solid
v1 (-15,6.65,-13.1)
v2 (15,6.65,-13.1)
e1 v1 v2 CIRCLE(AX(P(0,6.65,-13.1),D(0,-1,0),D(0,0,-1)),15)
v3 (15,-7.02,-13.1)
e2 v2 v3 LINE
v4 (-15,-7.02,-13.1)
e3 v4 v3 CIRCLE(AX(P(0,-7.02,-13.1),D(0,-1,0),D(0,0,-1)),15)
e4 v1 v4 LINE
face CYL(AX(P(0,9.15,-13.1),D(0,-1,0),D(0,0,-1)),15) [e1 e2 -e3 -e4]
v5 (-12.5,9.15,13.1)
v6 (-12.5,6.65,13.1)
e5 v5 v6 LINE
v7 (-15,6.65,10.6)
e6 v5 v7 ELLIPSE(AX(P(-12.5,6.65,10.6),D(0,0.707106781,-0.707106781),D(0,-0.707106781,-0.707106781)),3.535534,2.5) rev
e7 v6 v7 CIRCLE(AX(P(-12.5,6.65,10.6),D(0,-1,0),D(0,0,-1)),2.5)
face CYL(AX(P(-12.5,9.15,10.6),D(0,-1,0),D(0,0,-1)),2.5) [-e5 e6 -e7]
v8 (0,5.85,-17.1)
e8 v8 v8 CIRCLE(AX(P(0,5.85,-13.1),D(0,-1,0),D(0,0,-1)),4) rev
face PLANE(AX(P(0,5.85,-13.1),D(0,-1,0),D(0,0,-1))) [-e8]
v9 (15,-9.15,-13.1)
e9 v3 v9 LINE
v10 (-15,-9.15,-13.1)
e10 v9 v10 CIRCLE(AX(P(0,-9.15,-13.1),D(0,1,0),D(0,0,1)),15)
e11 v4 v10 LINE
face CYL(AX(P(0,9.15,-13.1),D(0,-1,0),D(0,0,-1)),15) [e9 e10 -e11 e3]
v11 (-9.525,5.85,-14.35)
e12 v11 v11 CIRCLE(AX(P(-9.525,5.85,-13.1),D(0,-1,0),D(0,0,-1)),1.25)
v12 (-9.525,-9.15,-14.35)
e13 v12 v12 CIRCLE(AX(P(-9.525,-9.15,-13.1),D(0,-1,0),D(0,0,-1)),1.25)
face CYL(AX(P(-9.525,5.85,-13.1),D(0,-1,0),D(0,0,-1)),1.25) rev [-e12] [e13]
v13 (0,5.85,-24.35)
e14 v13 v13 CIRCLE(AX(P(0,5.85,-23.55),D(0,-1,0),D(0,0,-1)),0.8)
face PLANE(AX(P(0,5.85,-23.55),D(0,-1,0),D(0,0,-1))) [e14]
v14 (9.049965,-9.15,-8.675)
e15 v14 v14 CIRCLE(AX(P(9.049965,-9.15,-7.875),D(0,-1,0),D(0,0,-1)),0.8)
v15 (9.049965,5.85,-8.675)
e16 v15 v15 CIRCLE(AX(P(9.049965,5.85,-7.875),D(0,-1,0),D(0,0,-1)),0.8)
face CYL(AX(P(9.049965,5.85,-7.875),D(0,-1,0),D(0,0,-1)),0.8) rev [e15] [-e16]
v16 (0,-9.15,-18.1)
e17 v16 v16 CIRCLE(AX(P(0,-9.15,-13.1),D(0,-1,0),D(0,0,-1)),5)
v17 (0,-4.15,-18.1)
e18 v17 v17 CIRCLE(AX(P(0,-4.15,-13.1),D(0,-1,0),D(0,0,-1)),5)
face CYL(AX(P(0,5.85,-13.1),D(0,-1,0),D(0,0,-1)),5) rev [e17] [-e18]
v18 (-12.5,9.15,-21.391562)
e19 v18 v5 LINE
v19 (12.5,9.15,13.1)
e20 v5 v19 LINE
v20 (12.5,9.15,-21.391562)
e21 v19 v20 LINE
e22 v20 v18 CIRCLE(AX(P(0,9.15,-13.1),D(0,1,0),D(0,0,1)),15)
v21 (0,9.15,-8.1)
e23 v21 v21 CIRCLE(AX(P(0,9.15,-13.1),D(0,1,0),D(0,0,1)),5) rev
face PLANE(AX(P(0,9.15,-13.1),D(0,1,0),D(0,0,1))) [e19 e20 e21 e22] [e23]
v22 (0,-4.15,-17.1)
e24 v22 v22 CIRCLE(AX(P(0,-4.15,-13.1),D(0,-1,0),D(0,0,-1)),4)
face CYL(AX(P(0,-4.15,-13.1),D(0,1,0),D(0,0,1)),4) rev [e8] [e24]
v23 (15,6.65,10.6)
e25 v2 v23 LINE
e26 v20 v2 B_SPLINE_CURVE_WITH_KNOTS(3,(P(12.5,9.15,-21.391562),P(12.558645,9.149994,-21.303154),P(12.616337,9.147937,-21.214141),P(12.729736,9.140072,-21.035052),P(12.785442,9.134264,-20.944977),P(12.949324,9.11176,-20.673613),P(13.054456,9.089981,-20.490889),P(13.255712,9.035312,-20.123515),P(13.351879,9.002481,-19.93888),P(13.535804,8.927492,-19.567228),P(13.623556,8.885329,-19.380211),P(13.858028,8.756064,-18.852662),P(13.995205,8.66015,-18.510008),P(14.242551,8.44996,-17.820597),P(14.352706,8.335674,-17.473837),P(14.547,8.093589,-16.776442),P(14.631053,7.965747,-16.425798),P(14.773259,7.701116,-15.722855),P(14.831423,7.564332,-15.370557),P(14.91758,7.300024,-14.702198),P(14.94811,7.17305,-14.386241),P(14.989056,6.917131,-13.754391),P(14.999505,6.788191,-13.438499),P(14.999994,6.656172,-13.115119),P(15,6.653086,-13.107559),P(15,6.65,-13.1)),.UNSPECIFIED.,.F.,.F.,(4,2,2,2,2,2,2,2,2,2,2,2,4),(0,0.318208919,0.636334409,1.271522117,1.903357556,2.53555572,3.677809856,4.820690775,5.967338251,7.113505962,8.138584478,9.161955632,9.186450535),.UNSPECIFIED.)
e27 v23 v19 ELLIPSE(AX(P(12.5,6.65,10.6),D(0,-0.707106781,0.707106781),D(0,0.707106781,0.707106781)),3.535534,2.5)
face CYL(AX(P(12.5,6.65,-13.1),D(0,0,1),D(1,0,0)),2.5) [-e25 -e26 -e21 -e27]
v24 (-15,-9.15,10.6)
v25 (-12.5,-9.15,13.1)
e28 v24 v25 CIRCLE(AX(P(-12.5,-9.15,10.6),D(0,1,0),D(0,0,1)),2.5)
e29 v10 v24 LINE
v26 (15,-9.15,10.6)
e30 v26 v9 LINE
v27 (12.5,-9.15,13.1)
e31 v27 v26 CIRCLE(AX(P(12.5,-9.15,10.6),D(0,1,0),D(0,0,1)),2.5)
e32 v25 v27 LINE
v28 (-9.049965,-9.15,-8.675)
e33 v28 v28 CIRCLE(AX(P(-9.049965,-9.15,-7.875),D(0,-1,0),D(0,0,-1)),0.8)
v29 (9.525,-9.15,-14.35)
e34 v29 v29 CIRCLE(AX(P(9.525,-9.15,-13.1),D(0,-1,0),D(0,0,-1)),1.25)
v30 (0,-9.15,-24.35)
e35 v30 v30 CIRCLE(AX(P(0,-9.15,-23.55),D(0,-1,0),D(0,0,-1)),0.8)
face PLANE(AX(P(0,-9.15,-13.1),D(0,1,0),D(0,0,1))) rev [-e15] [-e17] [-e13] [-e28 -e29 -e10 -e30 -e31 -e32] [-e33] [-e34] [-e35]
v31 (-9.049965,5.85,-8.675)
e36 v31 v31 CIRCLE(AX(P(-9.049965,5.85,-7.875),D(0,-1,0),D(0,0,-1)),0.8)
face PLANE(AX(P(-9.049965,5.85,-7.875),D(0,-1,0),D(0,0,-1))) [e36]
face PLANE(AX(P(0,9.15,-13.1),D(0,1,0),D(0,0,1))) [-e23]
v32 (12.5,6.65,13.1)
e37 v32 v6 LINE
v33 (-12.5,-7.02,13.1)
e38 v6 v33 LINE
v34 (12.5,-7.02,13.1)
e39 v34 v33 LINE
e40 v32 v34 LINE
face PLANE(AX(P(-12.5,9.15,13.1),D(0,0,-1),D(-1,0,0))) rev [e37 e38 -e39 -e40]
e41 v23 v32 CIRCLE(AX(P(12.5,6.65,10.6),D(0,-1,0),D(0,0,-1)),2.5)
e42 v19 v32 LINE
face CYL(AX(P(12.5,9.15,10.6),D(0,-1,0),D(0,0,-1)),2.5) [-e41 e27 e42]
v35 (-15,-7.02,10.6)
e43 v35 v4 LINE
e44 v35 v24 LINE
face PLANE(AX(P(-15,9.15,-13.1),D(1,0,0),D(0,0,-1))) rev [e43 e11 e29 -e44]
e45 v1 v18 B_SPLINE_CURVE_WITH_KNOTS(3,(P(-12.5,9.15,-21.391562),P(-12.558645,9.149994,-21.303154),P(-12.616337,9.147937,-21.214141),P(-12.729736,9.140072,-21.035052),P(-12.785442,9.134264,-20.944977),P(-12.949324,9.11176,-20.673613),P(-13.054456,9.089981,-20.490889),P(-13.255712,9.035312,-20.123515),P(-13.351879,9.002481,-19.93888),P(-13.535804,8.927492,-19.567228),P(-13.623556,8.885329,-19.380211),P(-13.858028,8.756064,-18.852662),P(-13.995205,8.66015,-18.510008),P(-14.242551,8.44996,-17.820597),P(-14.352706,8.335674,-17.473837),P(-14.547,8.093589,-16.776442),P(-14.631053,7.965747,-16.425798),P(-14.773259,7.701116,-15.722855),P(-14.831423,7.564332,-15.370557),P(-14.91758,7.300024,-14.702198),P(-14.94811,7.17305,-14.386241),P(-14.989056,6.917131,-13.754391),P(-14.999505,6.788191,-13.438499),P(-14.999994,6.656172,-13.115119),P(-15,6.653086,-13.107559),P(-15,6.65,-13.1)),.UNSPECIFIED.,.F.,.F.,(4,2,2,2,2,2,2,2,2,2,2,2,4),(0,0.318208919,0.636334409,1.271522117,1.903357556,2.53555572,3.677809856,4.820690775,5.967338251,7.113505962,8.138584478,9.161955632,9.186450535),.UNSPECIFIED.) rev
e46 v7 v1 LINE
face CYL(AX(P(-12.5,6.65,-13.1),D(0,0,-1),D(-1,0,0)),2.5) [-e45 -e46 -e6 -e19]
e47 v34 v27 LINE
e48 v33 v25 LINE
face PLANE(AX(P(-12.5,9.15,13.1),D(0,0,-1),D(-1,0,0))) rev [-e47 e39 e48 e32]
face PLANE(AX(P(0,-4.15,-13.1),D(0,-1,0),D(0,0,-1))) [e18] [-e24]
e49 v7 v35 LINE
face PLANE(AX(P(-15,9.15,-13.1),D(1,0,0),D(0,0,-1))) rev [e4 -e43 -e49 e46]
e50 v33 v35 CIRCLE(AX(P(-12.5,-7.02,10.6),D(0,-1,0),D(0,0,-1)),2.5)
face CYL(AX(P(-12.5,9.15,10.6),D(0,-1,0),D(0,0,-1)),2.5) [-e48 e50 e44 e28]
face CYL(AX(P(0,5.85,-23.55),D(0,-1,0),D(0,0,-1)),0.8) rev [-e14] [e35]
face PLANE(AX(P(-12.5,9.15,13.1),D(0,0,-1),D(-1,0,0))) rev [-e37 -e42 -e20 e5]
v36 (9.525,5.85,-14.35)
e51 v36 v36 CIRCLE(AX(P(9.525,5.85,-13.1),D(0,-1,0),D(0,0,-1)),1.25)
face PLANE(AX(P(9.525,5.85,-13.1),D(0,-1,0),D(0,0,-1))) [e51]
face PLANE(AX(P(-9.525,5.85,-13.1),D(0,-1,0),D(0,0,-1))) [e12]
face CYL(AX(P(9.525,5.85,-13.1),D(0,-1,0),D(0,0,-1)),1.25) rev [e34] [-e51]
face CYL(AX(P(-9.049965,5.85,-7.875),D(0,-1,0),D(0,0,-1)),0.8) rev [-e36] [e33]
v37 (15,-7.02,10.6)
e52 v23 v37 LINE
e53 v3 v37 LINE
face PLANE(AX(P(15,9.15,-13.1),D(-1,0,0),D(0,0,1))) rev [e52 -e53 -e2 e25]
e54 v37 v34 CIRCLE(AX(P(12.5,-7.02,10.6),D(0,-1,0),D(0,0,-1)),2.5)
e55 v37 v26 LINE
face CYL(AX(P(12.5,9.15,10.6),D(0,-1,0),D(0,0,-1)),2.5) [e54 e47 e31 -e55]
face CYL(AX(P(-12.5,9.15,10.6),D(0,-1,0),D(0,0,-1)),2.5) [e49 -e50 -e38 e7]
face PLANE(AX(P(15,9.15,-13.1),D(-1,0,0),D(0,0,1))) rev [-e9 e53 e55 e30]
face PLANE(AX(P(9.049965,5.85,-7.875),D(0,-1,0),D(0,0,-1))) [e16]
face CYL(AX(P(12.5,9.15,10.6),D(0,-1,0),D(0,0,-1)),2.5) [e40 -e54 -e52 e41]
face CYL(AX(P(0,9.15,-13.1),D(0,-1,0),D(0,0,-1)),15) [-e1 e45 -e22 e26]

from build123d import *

# Parameters (mm, degrees)
BOSS_EXTRUDE1_DEPTH = 9.15
FILLET1_R           = 2.5
SKETCH5_R           = 0.8
CUT_EXTRUDE1_DEPTH  = 15
SKETCH8_R           = 1.25
CUT_EXTRUDE2_DEPTH  = 15
SKETCH9_R           = 5
CUT_EXTRUDE3_DEPTH  = 15
BOSS_EXTRUDE2_START = 10
SKETCH10_R          = 5
SKETCH10_R_2        = 4
BOSS_EXTRUDE2_DEPTH = 10


with BuildPart() as part:
    # Sketch1 → Boss-Extrude1 (new, symmetric)
    with BuildSketch(Plane(origin=(0, 0, 0), x_dir=(1, 0, 0), z_dir=(0, 1, 0))):
        with BuildLine():
            Line((-15, 13.1), (-15, -10.6))
            ThreePointArc((-15, -10.6), (-14.267766953, -12.367766953), (-12.5, -13.1))
            Line((-12.5, -13.1), (12.5, -13.1))
            ThreePointArc((12.5, -13.1), (14.267766953, -12.367766953), (15, -10.6))
            Line((15, -10.6), (15, 13.1))
            ThreePointArc((15, 13.1), (0, 28.1), (-15, 13.1))
        make_face()
    extrude(amount=BOSS_EXTRUDE1_DEPTH, both=True)

    # Fillet1
    # the kernel refuses this fillet: 2.5 mm, written as the material it takes off along each edge
    with BuildSketch(Plane(origin=(-15, 9.15, -28.1), x_dir=(0, -1, 0), z_dir=(0, 0, 1)), Plane(origin=(15, 9.15, 25.6), x_dir=(0, -1, 0), z_dir=(0, 0, -1))) as fillet1_piece_1:
        with BuildLine():
            CenterArc((FILLET1_R, FILLET1_R), FILLET1_R, 180, 90)
            Line((0, FILLET1_R), (-FILLET1_R * 0.02, FILLET1_R))
            Line((-FILLET1_R * 0.02, FILLET1_R), (-FILLET1_R * 0.02, -FILLET1_R * 0.02))
            Line((-FILLET1_R * 0.02, -FILLET1_R * 0.02), (FILLET1_R, -FILLET1_R * 0.02))
            Line((FILLET1_R, -FILLET1_R * 0.02), (FILLET1_R, 0))
        make_face()
    extrude(amount=53.7, mode=Mode.SUBTRACT)

    # Sketch5 → Cut-Extrude1 (cut)
    with BuildSketch(Plane.XZ.offset(9.15)):
        with Locations(Location((0, -23.55, 0), (0, 0, 270))):
            Circle(SKETCH5_R)
        with Locations(Location((-9.04996547, -7.875, 0), (0, 0, 270))):
            Circle(SKETCH5_R)
        with Locations(Location((9.04996547, -7.875, 0), (0, 0, 270))):
            Circle(SKETCH5_R)
    extrude(amount=-CUT_EXTRUDE1_DEPTH, mode=Mode.SUBTRACT)

    # Sketch8 → Cut-Extrude2 (cut)
    with BuildSketch(Plane.XZ.offset(9.15)):
        with Locations(Location((-9.525, -13.1, 0), (0, 0, 270))):
            Circle(SKETCH8_R)
        with Locations(Location((9.525, -13.1, 0), (0, 0, 270))):
            Circle(SKETCH8_R)
    extrude(amount=-CUT_EXTRUDE2_DEPTH, mode=Mode.SUBTRACT)

    # Sketch9 → Cut-Extrude3 (cut)
    with BuildSketch(Plane.XZ.offset(9.15)):
        with Locations(Location((0, -13.1, 0), (0, 0, 270))):
            Circle(SKETCH9_R)
    extrude(amount=-CUT_EXTRUDE3_DEPTH, mode=Mode.SUBTRACT)

    # Sketch10 → Boss-Extrude2 (add)
    with BuildSketch(Plane.XZ.offset(-5.85).offset(BOSS_EXTRUDE2_START)):
        with Locations(Location((0, -13.1, 0), (0, 0, 270))):
            Circle(SKETCH10_R)
        with Locations(Location((0, -13.1, 0), (0, 0, 270))):
            Circle(SKETCH10_R_2, mode=Mode.SUBTRACT)
    extrude(amount=-BOSS_EXTRUDE2_DEPTH)


solid = part.part
